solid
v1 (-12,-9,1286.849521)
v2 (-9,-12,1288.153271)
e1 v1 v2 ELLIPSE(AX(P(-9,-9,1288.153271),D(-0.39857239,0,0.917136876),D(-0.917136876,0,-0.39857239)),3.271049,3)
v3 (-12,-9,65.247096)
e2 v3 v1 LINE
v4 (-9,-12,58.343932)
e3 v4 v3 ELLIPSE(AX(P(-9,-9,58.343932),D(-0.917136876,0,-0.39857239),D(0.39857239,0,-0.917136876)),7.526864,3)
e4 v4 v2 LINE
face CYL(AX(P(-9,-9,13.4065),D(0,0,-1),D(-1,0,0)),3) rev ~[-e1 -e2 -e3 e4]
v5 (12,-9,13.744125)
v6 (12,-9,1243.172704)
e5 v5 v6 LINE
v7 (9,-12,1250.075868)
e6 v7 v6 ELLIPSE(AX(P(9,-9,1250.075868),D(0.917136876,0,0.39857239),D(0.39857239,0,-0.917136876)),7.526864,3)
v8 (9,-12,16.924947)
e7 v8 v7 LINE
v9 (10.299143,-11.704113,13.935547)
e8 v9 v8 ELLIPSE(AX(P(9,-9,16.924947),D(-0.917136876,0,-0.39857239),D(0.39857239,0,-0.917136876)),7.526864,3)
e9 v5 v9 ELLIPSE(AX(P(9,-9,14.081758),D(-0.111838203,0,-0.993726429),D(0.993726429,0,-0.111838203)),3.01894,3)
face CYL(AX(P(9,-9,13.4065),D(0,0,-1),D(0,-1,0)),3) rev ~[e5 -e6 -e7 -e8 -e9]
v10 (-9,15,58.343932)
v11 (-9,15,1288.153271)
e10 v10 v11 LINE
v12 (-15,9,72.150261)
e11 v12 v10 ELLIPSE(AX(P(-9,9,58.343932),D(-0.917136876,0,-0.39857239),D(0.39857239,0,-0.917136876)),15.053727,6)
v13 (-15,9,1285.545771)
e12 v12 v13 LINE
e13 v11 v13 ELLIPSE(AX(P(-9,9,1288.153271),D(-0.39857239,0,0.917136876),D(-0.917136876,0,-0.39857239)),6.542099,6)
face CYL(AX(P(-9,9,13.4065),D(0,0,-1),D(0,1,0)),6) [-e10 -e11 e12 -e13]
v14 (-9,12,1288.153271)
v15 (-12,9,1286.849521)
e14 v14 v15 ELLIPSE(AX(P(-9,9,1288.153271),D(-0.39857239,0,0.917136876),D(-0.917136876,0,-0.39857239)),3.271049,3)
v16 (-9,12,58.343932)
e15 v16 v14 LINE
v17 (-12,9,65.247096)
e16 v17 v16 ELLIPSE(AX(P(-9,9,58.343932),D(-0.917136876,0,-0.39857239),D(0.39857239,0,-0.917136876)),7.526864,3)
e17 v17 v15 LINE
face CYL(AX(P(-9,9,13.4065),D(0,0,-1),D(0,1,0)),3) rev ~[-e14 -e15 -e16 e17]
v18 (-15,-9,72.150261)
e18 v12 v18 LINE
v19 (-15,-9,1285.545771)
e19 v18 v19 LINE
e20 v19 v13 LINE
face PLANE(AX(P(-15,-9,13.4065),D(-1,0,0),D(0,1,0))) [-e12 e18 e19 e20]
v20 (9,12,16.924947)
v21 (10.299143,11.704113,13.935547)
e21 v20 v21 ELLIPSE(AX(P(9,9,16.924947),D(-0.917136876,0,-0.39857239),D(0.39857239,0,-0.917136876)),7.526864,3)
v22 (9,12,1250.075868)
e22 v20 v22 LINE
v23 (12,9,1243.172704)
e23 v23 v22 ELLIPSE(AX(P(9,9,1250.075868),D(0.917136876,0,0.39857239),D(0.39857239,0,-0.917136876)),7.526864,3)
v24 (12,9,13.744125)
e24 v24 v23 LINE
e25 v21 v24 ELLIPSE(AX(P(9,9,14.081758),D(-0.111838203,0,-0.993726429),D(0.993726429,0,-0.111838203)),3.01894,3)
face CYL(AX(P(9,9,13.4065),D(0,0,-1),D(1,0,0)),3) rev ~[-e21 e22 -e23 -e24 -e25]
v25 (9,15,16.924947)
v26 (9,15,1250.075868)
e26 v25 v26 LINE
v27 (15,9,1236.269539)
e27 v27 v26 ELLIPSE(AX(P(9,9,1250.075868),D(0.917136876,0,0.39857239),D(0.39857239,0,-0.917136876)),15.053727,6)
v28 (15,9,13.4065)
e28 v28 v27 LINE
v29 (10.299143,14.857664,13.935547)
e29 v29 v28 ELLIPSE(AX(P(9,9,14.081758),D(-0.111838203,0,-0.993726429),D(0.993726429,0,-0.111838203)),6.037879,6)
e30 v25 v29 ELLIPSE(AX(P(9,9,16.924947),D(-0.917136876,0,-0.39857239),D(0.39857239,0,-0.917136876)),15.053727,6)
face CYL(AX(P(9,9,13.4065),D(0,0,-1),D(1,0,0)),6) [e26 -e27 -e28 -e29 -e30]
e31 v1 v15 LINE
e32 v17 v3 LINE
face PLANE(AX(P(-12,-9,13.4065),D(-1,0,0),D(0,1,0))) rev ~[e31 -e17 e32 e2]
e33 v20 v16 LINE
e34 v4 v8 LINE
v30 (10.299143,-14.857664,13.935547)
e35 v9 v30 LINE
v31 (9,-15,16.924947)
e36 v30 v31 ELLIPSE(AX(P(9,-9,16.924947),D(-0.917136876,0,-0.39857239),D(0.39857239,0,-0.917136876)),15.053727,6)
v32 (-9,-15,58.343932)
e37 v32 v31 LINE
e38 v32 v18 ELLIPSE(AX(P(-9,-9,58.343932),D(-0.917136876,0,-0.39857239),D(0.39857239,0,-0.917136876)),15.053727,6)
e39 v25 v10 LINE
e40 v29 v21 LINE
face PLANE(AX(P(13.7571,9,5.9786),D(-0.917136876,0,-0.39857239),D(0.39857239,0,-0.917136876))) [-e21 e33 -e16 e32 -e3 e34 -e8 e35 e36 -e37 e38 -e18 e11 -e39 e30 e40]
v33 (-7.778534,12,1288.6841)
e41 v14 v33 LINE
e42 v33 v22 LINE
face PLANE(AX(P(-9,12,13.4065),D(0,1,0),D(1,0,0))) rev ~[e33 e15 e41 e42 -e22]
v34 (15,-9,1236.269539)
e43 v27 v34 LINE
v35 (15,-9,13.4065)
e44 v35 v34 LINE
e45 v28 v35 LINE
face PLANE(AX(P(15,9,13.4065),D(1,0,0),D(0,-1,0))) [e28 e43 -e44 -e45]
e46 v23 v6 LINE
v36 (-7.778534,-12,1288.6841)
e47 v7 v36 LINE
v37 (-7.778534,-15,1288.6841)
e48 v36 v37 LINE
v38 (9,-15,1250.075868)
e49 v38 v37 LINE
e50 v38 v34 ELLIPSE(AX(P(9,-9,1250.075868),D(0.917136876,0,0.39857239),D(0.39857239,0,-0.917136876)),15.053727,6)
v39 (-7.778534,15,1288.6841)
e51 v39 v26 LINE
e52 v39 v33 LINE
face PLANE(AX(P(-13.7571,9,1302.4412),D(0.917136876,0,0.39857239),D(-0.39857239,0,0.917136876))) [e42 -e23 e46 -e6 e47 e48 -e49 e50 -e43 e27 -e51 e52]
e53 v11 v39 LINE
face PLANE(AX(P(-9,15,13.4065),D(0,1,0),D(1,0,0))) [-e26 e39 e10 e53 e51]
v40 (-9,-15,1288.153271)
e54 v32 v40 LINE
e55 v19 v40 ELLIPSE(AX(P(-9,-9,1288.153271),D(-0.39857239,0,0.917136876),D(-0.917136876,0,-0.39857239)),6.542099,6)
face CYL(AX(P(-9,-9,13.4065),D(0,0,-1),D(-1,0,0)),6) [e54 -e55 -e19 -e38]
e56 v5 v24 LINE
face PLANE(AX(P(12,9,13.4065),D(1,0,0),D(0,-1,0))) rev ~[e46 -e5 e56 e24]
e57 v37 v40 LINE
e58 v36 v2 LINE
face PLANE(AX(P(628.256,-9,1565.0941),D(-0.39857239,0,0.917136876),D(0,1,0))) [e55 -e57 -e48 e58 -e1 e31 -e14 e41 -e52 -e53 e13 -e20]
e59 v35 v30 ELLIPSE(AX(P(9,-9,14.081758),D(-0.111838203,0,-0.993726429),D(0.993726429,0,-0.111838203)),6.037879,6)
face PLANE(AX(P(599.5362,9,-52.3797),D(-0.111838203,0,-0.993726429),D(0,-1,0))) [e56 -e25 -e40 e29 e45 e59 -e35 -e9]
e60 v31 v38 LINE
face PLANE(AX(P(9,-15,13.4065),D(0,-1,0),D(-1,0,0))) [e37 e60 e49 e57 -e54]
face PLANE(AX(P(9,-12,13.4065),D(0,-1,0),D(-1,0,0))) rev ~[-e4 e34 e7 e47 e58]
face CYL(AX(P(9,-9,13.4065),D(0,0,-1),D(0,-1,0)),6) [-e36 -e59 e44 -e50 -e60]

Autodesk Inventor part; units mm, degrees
ref_plane "Start Plane" through (0, 0, 13.4065) normal (0, 0, 1) x (1, 0, 0)
ref_plane "End Plane" through (0, 0, 1288.6841) normal (0, 0, 1) x (1, 0, 0)
sketch "Sketch" plane through (0, 0, 0) normal (0, 0, 1) x (1, 0, 0)
  line L0 (-15, -9) -> (-15, 9)
  line L1 (-9, 15) -> (9, 15)
  line L2 (15, 9) -> (15, -9)
  line L3 (9, -15) -> (-9, -15)
  arc A0 (-15, -9) -> (-9, -15) centre (-9, -9) ccw
  arc A1 (-9, 15) -> (-15, 9) centre (-9, 9) ccw
  arc A2 (15, 9) -> (9, 15) centre (9, 9) ccw
  arc A3 (9, -15) -> (15, -9) centre (9, -9) ccw
  arc A4 (-9, 12) -> (-12, 9) centre (-9, 9) ccw
  line L4 (-9, 12) -> (9, 12)
  arc A5 (12, 9) -> (9, 12) centre (9, 9) ccw
  line L5 (12, 9) -> (12, -9)
  arc A6 (9, -12) -> (12, -9) centre (9, -9) ccw
  line L6 (9, -12) -> (-9, -12)
  arc A7 (-12, -9) -> (-9, -12) centre (-9, -9) ccw
  line L7 (-12, -9) -> (-12, 9)
  line L8 (0, 22.7397) -> (0, -22.7397) construction
  line L9 (-22.7397, 0) -> (22.7397, 0) construction
  dimension "d7" = 6
  dimension "d10" = 30
  dimension "d11" = 30
  dimension "d12" = 3
  dimension "d15" = 15
  dimension "d16" = 15
extrude "Body" add sketch "Sketch" along normal up to surface (1275.2776 mm away) from surface at 13.4065
sketch "Sketch3" plane through (0, 0, 0) normal (0, 0, 1) x (1, 0, 0)
  line L0 (0, 0) -> (10, 0)
ref_plane "Work Plane3" through (0, 0, 0) normal (0, -1, 0) x (1, 0, 0)
ref_plane "Work Plane4" through (13.7571, 9, 5.9786) normal (-0.9171369, 0, -0.3985724) x (-0.3985724, 0, 0.9171369)
split "Split1" plane through (13.7571, 9, 5.9786) removes the side toward (-0.9171369, 0, -0.3985724)
ref_plane "Work Plane5" through (599.5362, 9, -52.3797) normal (-0.1118382, 0, -0.9937264) x (-0.9937264, 0, 0.1118382)
split "Split2" plane through (599.5362, 9, -52.3797) removes the side toward (-0.1118382, 0, -0.9937264)
ref_plane "Work Plane6" through (628.256, -9, 1565.0941) normal (-0.3985724, 0, 0.9171369) x (0.9171369, 0, 0.3985724)
split "Split3" plane through (628.256, -9, 1565.0941) removes the side toward (-0.3985724, 0, 0.9171369)
ref_plane "Work Plane7" through (-13.7571, 9, 1302.4412) normal (0.9171369, 0, 0.3985724) x (0.3985724, 0, -0.9171369)
split "Split4" plane through (-13.7571, 9, 1302.4412) removes the side toward (0.9171369, 0, 0.3985724)
sketch "Sketch4" plane through (0, 0, 0) normal (0, -1, 0) x (1, 0, 0)
  line L0 (-2, 13.4065) -> (12, 13.4065) projected
  line L1 (-2, 1288.6841) -> (12, 1288.6841) projected
  dimension "d18" = 1275.2776
equation "\"d7\" = G_IR"
equation "\"d10\" = G_H"
equation "\"d11\" = G_W"
equation "\"d12\" = G_T"
equation "\"d15\" = 0.5 * d10"
equation "\"d16\" = 0.5 * d11"
equation "\"d3\" = G_L"
equation "\"G_W\" = 30"
equation "\"G_H\" = 30"
equation "\"G_T\" = 3"
equation "\"G_IR\" = 6"
equation "\"G_L\" = d18"
equation "\"G_OFFSET_START\" = -13.40653"
equation "\"G_OFFSET_END\" = -19.73564"
equation "\"d13\" = -G_OFFSET_START"
equation "\"d14\" = G_OFFSET_END + B_L"
equation "\"B_L\" = 1308.41975"
properties part number "DIN EN 10219-2 - 30 x 30 x 3  - 1275.28" material "Steel, Mild"
